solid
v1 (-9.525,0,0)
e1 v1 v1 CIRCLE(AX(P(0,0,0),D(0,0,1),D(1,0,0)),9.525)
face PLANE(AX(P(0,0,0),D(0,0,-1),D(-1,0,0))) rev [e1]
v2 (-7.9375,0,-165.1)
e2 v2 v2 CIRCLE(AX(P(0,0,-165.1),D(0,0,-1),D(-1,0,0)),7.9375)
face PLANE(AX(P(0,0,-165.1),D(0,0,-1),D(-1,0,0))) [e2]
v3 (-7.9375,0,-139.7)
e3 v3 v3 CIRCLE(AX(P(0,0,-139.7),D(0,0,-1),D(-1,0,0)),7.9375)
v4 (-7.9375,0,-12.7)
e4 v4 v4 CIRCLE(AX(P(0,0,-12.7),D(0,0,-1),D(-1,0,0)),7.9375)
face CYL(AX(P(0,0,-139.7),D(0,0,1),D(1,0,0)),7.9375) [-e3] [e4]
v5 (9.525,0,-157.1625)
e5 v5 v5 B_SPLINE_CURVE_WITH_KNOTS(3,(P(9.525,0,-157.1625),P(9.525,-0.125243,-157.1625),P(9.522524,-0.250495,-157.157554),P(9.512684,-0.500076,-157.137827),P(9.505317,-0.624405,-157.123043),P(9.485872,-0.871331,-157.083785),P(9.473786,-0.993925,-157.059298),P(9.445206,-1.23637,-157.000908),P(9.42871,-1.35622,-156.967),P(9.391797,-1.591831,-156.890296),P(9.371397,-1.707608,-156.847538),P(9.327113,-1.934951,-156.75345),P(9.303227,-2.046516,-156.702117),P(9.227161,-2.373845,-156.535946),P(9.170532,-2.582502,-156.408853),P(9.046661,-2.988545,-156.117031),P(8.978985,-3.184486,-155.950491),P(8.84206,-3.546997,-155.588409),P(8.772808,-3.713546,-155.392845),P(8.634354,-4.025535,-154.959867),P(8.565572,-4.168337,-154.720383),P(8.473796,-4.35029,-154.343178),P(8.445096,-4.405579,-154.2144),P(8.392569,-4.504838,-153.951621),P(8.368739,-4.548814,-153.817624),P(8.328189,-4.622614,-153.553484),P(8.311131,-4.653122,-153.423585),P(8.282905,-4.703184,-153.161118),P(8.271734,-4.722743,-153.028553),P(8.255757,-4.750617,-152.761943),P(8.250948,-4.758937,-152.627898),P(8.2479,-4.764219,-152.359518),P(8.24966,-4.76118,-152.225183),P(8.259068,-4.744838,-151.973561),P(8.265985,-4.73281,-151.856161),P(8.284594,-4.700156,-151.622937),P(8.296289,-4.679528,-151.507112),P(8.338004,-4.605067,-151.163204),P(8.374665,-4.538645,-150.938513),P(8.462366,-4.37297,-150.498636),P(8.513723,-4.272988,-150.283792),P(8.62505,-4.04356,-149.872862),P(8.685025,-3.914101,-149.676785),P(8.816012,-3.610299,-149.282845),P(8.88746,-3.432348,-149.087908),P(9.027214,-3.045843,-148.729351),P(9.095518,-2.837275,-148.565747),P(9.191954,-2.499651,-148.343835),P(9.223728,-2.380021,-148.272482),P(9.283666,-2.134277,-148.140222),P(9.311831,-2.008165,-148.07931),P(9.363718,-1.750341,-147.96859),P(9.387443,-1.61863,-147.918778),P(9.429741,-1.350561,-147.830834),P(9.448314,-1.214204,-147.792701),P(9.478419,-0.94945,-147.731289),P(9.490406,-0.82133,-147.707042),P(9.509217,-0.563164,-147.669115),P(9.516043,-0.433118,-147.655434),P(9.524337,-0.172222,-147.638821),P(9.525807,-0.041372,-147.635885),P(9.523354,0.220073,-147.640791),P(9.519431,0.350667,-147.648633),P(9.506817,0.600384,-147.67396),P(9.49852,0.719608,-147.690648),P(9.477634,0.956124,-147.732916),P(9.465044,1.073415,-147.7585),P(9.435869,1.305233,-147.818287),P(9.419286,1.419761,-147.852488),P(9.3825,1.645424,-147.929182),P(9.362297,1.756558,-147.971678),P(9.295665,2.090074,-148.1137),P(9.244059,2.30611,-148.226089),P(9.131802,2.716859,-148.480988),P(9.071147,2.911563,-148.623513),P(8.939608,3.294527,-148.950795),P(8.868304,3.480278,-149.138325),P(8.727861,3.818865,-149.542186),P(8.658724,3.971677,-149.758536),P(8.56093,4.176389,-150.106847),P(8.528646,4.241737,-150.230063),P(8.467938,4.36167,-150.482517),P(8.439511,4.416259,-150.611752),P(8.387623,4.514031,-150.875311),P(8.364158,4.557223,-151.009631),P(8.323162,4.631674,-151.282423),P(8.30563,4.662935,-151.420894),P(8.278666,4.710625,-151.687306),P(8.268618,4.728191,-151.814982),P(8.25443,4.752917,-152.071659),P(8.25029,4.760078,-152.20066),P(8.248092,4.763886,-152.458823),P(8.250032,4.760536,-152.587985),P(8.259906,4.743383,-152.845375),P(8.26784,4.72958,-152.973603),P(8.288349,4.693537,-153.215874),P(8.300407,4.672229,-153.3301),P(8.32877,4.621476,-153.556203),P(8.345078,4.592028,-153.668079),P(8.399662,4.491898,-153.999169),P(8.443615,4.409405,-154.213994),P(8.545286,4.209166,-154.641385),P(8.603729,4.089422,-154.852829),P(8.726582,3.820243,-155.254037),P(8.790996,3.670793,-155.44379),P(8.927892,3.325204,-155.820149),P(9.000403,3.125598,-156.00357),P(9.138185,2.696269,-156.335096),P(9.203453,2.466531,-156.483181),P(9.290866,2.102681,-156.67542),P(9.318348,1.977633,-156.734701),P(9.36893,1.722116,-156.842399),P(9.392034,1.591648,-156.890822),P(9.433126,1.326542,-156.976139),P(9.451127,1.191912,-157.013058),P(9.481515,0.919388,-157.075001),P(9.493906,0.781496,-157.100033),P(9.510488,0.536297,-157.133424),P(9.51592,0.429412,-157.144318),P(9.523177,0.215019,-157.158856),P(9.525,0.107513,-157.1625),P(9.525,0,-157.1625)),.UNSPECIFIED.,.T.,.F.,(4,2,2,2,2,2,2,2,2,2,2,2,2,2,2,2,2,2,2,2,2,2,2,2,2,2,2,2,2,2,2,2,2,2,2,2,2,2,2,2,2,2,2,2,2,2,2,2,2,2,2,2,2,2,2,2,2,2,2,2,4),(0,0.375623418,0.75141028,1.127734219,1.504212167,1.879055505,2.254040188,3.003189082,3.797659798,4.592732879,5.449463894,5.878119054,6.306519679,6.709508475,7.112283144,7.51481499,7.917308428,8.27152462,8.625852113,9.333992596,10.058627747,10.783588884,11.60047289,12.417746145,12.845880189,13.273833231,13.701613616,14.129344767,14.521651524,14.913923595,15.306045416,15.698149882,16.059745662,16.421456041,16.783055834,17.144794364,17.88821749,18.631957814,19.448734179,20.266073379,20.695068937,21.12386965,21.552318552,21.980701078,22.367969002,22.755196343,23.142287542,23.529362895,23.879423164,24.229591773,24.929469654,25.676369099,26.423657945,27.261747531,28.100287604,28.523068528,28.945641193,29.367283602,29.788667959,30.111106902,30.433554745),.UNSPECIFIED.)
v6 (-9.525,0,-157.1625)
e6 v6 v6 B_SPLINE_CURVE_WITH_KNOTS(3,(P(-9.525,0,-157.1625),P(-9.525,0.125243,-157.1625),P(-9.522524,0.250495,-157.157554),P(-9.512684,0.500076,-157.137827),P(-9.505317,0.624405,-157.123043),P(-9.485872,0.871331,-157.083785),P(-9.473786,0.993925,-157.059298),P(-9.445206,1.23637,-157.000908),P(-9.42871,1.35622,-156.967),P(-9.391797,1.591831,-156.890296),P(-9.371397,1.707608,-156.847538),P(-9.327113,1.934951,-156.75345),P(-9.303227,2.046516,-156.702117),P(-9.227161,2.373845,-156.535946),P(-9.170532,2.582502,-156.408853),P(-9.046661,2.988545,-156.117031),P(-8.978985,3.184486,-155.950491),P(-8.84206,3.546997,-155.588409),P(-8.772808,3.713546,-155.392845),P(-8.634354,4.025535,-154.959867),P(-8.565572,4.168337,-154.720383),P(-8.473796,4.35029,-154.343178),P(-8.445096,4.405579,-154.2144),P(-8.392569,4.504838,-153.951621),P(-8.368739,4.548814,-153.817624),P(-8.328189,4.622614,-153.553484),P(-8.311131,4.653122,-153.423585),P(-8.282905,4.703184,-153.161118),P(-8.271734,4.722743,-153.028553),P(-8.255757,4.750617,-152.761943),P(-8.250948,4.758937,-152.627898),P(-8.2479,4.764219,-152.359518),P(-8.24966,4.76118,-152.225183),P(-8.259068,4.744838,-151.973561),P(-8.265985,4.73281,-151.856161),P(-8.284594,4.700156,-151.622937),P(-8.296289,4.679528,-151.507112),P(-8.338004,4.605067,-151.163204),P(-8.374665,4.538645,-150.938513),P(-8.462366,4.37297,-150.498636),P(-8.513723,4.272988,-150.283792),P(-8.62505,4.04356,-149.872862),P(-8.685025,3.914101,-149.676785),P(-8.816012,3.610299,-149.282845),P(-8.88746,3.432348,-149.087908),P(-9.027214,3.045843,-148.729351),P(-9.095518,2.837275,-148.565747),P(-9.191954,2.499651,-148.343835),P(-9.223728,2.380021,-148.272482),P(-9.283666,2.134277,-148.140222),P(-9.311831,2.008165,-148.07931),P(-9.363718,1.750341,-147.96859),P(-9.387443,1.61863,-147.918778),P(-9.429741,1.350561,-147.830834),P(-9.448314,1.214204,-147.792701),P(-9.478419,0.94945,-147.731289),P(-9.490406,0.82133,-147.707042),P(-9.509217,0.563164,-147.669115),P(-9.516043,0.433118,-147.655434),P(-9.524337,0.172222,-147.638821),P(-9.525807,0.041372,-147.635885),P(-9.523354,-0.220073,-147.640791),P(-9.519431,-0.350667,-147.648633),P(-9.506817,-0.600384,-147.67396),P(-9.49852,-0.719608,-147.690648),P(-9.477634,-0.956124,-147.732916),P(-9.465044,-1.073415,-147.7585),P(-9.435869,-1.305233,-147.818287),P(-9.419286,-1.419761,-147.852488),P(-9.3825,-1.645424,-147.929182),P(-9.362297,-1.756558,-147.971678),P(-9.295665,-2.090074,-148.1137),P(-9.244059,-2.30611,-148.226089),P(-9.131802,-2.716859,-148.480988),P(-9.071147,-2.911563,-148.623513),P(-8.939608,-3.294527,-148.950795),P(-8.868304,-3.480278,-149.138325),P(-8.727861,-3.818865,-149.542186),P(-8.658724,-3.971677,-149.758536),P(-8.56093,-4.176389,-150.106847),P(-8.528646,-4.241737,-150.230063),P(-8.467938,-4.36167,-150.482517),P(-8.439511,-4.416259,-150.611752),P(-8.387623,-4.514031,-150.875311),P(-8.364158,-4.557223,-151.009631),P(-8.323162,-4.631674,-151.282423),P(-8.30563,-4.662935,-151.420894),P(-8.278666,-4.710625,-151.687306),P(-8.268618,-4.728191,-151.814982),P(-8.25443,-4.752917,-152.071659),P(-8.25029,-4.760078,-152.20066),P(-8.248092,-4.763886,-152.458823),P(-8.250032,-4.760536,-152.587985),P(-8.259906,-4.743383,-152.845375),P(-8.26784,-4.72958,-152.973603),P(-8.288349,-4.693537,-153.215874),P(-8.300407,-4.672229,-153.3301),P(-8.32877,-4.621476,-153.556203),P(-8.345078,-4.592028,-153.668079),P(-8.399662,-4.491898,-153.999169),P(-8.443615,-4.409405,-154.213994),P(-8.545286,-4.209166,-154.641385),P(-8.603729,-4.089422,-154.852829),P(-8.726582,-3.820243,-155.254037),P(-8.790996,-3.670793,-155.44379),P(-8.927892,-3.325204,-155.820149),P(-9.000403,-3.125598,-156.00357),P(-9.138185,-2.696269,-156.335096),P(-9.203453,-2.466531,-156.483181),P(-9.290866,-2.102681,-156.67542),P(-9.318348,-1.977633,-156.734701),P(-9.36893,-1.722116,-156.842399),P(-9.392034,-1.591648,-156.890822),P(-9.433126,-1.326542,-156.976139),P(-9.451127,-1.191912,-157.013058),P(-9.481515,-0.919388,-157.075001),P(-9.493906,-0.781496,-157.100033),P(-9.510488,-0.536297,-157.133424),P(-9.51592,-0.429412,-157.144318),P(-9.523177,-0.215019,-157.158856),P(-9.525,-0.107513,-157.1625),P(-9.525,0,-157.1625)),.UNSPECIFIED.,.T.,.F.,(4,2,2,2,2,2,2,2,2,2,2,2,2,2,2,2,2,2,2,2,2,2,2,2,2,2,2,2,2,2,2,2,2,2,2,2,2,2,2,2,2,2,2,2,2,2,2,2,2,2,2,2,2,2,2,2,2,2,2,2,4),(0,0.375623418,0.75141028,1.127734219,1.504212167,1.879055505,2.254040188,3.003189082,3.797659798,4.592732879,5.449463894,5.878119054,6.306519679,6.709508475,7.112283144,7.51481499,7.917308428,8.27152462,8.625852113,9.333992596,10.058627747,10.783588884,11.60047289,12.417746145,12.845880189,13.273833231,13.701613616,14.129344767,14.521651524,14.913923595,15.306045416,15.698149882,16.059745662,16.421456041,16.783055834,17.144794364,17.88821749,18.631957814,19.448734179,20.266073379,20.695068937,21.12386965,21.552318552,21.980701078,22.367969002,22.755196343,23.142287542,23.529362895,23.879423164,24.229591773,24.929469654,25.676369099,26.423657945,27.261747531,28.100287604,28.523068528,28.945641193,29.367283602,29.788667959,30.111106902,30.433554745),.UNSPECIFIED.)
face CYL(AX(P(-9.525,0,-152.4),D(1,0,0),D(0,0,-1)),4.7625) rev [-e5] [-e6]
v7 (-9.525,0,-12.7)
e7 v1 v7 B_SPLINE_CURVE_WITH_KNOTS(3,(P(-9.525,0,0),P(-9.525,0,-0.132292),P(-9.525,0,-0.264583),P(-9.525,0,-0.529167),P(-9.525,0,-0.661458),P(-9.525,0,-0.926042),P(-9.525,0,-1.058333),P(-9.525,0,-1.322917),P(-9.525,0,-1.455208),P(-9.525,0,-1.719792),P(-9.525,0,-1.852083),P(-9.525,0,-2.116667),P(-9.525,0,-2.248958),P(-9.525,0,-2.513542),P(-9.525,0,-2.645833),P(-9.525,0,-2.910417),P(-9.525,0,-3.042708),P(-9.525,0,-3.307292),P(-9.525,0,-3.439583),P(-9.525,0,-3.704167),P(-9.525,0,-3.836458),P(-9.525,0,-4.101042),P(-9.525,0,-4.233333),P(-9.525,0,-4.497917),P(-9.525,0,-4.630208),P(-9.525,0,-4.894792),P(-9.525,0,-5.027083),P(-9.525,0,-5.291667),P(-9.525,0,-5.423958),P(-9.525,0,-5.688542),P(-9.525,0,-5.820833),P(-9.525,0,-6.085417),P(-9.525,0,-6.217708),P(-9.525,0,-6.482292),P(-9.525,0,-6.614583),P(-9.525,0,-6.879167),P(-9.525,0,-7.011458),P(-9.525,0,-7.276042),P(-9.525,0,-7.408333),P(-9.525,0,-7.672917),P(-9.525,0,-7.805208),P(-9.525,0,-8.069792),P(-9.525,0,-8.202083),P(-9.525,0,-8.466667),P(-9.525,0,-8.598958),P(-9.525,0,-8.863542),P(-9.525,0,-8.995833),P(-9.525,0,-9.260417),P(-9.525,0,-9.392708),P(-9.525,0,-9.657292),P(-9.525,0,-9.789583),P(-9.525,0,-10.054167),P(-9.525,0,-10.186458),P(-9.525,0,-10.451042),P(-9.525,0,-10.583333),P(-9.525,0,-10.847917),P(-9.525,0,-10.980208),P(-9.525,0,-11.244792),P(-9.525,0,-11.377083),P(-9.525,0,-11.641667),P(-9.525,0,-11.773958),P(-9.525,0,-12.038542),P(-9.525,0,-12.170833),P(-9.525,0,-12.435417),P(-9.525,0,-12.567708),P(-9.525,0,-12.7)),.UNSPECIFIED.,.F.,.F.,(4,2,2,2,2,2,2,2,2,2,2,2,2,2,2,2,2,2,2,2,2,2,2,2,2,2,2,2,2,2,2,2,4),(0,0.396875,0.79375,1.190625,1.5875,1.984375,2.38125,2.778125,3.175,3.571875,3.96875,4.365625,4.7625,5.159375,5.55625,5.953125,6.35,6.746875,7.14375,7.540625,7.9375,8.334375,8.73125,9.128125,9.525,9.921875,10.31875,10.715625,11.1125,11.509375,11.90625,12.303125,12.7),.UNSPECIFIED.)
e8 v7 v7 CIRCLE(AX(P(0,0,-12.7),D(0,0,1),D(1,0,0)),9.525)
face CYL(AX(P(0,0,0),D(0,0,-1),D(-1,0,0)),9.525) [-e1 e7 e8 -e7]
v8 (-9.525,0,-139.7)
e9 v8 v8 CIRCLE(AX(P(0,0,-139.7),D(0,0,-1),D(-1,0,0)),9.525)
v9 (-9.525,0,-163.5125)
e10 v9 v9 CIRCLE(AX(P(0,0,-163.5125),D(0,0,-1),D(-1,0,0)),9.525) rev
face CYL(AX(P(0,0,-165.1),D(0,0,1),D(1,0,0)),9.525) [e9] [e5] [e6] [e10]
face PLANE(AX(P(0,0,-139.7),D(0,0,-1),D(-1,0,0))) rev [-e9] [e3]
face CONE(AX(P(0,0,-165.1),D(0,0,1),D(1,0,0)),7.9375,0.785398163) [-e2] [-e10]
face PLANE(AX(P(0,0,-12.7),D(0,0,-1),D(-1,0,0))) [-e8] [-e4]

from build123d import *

# Parameters (mm, degrees)
F_3DSKETCH2_R           = 9.525
BOSS_EXTRUDE1_DEPTH     = 12.7
SKETCH1_R               = 7.9375
BOSS_EXTRUDE2_DEPTH     = 127
SKETCH2_R               = 9.525
BOSS_EXTRUDE3_DEPTH     = 25.4
CHAMFER2_SIZE           = 1.5875
CUT_EXTRUDE1_DEPTH      = 166.648607751
CUT_EXTRUDE1_DEPTH_BACK = 166.648607751
SKETCH3_R               = 4.7625


with BuildPart() as part:
    # 3DSketch2 → Boss-Extrude1 (new body)
    with BuildSketch(Plane(origin=(0, 0, 0), x_dir=(-1, 0, 0), z_dir=(0, 0, -1))):
        Circle(F_3DSKETCH2_R)
    extrude(amount=BOSS_EXTRUDE1_DEPTH)

    # Sketch1 → Boss-Extrude2 (add)
    with BuildSketch(Plane(origin=(0, 0, -12.7), x_dir=(-1, 0, 0), z_dir=(0, 0, -1))):
        Circle(SKETCH1_R)
    extrude(amount=BOSS_EXTRUDE2_DEPTH)

    # Sketch2 → Boss-Extrude3 (add)
    with BuildSketch(Plane(origin=(0, 0, -139.7), x_dir=(-1, 0, 0), z_dir=(0, 0, -1))):
        Circle(SKETCH2_R)
    extrude(amount=BOSS_EXTRUDE3_DEPTH)

    # Chamfer2
    chamfer2_edges = [part.edges().sort_by_distance(p)[0] for p in [
        (9.525, 0, -165.1),
    ]]
    chamfer(chamfer2_edges, length=CHAMFER2_SIZE)

    # Sketch3 → Cut-Extrude1 (cut, two sides: drawn at the far end of the back side and taken through both)
    with BuildSketch(Plane(origin=(0, 0, 0), x_dir=(0, 0, -1), z_dir=(1, 0, 0)).offset(-CUT_EXTRUDE1_DEPTH_BACK)):
        with Locations((152.4, 0)):
            Circle(SKETCH3_R)
    extrude(amount=CUT_EXTRUDE1_DEPTH + CUT_EXTRUDE1_DEPTH_BACK, mode=Mode.SUBTRACT)


solid = part.part
